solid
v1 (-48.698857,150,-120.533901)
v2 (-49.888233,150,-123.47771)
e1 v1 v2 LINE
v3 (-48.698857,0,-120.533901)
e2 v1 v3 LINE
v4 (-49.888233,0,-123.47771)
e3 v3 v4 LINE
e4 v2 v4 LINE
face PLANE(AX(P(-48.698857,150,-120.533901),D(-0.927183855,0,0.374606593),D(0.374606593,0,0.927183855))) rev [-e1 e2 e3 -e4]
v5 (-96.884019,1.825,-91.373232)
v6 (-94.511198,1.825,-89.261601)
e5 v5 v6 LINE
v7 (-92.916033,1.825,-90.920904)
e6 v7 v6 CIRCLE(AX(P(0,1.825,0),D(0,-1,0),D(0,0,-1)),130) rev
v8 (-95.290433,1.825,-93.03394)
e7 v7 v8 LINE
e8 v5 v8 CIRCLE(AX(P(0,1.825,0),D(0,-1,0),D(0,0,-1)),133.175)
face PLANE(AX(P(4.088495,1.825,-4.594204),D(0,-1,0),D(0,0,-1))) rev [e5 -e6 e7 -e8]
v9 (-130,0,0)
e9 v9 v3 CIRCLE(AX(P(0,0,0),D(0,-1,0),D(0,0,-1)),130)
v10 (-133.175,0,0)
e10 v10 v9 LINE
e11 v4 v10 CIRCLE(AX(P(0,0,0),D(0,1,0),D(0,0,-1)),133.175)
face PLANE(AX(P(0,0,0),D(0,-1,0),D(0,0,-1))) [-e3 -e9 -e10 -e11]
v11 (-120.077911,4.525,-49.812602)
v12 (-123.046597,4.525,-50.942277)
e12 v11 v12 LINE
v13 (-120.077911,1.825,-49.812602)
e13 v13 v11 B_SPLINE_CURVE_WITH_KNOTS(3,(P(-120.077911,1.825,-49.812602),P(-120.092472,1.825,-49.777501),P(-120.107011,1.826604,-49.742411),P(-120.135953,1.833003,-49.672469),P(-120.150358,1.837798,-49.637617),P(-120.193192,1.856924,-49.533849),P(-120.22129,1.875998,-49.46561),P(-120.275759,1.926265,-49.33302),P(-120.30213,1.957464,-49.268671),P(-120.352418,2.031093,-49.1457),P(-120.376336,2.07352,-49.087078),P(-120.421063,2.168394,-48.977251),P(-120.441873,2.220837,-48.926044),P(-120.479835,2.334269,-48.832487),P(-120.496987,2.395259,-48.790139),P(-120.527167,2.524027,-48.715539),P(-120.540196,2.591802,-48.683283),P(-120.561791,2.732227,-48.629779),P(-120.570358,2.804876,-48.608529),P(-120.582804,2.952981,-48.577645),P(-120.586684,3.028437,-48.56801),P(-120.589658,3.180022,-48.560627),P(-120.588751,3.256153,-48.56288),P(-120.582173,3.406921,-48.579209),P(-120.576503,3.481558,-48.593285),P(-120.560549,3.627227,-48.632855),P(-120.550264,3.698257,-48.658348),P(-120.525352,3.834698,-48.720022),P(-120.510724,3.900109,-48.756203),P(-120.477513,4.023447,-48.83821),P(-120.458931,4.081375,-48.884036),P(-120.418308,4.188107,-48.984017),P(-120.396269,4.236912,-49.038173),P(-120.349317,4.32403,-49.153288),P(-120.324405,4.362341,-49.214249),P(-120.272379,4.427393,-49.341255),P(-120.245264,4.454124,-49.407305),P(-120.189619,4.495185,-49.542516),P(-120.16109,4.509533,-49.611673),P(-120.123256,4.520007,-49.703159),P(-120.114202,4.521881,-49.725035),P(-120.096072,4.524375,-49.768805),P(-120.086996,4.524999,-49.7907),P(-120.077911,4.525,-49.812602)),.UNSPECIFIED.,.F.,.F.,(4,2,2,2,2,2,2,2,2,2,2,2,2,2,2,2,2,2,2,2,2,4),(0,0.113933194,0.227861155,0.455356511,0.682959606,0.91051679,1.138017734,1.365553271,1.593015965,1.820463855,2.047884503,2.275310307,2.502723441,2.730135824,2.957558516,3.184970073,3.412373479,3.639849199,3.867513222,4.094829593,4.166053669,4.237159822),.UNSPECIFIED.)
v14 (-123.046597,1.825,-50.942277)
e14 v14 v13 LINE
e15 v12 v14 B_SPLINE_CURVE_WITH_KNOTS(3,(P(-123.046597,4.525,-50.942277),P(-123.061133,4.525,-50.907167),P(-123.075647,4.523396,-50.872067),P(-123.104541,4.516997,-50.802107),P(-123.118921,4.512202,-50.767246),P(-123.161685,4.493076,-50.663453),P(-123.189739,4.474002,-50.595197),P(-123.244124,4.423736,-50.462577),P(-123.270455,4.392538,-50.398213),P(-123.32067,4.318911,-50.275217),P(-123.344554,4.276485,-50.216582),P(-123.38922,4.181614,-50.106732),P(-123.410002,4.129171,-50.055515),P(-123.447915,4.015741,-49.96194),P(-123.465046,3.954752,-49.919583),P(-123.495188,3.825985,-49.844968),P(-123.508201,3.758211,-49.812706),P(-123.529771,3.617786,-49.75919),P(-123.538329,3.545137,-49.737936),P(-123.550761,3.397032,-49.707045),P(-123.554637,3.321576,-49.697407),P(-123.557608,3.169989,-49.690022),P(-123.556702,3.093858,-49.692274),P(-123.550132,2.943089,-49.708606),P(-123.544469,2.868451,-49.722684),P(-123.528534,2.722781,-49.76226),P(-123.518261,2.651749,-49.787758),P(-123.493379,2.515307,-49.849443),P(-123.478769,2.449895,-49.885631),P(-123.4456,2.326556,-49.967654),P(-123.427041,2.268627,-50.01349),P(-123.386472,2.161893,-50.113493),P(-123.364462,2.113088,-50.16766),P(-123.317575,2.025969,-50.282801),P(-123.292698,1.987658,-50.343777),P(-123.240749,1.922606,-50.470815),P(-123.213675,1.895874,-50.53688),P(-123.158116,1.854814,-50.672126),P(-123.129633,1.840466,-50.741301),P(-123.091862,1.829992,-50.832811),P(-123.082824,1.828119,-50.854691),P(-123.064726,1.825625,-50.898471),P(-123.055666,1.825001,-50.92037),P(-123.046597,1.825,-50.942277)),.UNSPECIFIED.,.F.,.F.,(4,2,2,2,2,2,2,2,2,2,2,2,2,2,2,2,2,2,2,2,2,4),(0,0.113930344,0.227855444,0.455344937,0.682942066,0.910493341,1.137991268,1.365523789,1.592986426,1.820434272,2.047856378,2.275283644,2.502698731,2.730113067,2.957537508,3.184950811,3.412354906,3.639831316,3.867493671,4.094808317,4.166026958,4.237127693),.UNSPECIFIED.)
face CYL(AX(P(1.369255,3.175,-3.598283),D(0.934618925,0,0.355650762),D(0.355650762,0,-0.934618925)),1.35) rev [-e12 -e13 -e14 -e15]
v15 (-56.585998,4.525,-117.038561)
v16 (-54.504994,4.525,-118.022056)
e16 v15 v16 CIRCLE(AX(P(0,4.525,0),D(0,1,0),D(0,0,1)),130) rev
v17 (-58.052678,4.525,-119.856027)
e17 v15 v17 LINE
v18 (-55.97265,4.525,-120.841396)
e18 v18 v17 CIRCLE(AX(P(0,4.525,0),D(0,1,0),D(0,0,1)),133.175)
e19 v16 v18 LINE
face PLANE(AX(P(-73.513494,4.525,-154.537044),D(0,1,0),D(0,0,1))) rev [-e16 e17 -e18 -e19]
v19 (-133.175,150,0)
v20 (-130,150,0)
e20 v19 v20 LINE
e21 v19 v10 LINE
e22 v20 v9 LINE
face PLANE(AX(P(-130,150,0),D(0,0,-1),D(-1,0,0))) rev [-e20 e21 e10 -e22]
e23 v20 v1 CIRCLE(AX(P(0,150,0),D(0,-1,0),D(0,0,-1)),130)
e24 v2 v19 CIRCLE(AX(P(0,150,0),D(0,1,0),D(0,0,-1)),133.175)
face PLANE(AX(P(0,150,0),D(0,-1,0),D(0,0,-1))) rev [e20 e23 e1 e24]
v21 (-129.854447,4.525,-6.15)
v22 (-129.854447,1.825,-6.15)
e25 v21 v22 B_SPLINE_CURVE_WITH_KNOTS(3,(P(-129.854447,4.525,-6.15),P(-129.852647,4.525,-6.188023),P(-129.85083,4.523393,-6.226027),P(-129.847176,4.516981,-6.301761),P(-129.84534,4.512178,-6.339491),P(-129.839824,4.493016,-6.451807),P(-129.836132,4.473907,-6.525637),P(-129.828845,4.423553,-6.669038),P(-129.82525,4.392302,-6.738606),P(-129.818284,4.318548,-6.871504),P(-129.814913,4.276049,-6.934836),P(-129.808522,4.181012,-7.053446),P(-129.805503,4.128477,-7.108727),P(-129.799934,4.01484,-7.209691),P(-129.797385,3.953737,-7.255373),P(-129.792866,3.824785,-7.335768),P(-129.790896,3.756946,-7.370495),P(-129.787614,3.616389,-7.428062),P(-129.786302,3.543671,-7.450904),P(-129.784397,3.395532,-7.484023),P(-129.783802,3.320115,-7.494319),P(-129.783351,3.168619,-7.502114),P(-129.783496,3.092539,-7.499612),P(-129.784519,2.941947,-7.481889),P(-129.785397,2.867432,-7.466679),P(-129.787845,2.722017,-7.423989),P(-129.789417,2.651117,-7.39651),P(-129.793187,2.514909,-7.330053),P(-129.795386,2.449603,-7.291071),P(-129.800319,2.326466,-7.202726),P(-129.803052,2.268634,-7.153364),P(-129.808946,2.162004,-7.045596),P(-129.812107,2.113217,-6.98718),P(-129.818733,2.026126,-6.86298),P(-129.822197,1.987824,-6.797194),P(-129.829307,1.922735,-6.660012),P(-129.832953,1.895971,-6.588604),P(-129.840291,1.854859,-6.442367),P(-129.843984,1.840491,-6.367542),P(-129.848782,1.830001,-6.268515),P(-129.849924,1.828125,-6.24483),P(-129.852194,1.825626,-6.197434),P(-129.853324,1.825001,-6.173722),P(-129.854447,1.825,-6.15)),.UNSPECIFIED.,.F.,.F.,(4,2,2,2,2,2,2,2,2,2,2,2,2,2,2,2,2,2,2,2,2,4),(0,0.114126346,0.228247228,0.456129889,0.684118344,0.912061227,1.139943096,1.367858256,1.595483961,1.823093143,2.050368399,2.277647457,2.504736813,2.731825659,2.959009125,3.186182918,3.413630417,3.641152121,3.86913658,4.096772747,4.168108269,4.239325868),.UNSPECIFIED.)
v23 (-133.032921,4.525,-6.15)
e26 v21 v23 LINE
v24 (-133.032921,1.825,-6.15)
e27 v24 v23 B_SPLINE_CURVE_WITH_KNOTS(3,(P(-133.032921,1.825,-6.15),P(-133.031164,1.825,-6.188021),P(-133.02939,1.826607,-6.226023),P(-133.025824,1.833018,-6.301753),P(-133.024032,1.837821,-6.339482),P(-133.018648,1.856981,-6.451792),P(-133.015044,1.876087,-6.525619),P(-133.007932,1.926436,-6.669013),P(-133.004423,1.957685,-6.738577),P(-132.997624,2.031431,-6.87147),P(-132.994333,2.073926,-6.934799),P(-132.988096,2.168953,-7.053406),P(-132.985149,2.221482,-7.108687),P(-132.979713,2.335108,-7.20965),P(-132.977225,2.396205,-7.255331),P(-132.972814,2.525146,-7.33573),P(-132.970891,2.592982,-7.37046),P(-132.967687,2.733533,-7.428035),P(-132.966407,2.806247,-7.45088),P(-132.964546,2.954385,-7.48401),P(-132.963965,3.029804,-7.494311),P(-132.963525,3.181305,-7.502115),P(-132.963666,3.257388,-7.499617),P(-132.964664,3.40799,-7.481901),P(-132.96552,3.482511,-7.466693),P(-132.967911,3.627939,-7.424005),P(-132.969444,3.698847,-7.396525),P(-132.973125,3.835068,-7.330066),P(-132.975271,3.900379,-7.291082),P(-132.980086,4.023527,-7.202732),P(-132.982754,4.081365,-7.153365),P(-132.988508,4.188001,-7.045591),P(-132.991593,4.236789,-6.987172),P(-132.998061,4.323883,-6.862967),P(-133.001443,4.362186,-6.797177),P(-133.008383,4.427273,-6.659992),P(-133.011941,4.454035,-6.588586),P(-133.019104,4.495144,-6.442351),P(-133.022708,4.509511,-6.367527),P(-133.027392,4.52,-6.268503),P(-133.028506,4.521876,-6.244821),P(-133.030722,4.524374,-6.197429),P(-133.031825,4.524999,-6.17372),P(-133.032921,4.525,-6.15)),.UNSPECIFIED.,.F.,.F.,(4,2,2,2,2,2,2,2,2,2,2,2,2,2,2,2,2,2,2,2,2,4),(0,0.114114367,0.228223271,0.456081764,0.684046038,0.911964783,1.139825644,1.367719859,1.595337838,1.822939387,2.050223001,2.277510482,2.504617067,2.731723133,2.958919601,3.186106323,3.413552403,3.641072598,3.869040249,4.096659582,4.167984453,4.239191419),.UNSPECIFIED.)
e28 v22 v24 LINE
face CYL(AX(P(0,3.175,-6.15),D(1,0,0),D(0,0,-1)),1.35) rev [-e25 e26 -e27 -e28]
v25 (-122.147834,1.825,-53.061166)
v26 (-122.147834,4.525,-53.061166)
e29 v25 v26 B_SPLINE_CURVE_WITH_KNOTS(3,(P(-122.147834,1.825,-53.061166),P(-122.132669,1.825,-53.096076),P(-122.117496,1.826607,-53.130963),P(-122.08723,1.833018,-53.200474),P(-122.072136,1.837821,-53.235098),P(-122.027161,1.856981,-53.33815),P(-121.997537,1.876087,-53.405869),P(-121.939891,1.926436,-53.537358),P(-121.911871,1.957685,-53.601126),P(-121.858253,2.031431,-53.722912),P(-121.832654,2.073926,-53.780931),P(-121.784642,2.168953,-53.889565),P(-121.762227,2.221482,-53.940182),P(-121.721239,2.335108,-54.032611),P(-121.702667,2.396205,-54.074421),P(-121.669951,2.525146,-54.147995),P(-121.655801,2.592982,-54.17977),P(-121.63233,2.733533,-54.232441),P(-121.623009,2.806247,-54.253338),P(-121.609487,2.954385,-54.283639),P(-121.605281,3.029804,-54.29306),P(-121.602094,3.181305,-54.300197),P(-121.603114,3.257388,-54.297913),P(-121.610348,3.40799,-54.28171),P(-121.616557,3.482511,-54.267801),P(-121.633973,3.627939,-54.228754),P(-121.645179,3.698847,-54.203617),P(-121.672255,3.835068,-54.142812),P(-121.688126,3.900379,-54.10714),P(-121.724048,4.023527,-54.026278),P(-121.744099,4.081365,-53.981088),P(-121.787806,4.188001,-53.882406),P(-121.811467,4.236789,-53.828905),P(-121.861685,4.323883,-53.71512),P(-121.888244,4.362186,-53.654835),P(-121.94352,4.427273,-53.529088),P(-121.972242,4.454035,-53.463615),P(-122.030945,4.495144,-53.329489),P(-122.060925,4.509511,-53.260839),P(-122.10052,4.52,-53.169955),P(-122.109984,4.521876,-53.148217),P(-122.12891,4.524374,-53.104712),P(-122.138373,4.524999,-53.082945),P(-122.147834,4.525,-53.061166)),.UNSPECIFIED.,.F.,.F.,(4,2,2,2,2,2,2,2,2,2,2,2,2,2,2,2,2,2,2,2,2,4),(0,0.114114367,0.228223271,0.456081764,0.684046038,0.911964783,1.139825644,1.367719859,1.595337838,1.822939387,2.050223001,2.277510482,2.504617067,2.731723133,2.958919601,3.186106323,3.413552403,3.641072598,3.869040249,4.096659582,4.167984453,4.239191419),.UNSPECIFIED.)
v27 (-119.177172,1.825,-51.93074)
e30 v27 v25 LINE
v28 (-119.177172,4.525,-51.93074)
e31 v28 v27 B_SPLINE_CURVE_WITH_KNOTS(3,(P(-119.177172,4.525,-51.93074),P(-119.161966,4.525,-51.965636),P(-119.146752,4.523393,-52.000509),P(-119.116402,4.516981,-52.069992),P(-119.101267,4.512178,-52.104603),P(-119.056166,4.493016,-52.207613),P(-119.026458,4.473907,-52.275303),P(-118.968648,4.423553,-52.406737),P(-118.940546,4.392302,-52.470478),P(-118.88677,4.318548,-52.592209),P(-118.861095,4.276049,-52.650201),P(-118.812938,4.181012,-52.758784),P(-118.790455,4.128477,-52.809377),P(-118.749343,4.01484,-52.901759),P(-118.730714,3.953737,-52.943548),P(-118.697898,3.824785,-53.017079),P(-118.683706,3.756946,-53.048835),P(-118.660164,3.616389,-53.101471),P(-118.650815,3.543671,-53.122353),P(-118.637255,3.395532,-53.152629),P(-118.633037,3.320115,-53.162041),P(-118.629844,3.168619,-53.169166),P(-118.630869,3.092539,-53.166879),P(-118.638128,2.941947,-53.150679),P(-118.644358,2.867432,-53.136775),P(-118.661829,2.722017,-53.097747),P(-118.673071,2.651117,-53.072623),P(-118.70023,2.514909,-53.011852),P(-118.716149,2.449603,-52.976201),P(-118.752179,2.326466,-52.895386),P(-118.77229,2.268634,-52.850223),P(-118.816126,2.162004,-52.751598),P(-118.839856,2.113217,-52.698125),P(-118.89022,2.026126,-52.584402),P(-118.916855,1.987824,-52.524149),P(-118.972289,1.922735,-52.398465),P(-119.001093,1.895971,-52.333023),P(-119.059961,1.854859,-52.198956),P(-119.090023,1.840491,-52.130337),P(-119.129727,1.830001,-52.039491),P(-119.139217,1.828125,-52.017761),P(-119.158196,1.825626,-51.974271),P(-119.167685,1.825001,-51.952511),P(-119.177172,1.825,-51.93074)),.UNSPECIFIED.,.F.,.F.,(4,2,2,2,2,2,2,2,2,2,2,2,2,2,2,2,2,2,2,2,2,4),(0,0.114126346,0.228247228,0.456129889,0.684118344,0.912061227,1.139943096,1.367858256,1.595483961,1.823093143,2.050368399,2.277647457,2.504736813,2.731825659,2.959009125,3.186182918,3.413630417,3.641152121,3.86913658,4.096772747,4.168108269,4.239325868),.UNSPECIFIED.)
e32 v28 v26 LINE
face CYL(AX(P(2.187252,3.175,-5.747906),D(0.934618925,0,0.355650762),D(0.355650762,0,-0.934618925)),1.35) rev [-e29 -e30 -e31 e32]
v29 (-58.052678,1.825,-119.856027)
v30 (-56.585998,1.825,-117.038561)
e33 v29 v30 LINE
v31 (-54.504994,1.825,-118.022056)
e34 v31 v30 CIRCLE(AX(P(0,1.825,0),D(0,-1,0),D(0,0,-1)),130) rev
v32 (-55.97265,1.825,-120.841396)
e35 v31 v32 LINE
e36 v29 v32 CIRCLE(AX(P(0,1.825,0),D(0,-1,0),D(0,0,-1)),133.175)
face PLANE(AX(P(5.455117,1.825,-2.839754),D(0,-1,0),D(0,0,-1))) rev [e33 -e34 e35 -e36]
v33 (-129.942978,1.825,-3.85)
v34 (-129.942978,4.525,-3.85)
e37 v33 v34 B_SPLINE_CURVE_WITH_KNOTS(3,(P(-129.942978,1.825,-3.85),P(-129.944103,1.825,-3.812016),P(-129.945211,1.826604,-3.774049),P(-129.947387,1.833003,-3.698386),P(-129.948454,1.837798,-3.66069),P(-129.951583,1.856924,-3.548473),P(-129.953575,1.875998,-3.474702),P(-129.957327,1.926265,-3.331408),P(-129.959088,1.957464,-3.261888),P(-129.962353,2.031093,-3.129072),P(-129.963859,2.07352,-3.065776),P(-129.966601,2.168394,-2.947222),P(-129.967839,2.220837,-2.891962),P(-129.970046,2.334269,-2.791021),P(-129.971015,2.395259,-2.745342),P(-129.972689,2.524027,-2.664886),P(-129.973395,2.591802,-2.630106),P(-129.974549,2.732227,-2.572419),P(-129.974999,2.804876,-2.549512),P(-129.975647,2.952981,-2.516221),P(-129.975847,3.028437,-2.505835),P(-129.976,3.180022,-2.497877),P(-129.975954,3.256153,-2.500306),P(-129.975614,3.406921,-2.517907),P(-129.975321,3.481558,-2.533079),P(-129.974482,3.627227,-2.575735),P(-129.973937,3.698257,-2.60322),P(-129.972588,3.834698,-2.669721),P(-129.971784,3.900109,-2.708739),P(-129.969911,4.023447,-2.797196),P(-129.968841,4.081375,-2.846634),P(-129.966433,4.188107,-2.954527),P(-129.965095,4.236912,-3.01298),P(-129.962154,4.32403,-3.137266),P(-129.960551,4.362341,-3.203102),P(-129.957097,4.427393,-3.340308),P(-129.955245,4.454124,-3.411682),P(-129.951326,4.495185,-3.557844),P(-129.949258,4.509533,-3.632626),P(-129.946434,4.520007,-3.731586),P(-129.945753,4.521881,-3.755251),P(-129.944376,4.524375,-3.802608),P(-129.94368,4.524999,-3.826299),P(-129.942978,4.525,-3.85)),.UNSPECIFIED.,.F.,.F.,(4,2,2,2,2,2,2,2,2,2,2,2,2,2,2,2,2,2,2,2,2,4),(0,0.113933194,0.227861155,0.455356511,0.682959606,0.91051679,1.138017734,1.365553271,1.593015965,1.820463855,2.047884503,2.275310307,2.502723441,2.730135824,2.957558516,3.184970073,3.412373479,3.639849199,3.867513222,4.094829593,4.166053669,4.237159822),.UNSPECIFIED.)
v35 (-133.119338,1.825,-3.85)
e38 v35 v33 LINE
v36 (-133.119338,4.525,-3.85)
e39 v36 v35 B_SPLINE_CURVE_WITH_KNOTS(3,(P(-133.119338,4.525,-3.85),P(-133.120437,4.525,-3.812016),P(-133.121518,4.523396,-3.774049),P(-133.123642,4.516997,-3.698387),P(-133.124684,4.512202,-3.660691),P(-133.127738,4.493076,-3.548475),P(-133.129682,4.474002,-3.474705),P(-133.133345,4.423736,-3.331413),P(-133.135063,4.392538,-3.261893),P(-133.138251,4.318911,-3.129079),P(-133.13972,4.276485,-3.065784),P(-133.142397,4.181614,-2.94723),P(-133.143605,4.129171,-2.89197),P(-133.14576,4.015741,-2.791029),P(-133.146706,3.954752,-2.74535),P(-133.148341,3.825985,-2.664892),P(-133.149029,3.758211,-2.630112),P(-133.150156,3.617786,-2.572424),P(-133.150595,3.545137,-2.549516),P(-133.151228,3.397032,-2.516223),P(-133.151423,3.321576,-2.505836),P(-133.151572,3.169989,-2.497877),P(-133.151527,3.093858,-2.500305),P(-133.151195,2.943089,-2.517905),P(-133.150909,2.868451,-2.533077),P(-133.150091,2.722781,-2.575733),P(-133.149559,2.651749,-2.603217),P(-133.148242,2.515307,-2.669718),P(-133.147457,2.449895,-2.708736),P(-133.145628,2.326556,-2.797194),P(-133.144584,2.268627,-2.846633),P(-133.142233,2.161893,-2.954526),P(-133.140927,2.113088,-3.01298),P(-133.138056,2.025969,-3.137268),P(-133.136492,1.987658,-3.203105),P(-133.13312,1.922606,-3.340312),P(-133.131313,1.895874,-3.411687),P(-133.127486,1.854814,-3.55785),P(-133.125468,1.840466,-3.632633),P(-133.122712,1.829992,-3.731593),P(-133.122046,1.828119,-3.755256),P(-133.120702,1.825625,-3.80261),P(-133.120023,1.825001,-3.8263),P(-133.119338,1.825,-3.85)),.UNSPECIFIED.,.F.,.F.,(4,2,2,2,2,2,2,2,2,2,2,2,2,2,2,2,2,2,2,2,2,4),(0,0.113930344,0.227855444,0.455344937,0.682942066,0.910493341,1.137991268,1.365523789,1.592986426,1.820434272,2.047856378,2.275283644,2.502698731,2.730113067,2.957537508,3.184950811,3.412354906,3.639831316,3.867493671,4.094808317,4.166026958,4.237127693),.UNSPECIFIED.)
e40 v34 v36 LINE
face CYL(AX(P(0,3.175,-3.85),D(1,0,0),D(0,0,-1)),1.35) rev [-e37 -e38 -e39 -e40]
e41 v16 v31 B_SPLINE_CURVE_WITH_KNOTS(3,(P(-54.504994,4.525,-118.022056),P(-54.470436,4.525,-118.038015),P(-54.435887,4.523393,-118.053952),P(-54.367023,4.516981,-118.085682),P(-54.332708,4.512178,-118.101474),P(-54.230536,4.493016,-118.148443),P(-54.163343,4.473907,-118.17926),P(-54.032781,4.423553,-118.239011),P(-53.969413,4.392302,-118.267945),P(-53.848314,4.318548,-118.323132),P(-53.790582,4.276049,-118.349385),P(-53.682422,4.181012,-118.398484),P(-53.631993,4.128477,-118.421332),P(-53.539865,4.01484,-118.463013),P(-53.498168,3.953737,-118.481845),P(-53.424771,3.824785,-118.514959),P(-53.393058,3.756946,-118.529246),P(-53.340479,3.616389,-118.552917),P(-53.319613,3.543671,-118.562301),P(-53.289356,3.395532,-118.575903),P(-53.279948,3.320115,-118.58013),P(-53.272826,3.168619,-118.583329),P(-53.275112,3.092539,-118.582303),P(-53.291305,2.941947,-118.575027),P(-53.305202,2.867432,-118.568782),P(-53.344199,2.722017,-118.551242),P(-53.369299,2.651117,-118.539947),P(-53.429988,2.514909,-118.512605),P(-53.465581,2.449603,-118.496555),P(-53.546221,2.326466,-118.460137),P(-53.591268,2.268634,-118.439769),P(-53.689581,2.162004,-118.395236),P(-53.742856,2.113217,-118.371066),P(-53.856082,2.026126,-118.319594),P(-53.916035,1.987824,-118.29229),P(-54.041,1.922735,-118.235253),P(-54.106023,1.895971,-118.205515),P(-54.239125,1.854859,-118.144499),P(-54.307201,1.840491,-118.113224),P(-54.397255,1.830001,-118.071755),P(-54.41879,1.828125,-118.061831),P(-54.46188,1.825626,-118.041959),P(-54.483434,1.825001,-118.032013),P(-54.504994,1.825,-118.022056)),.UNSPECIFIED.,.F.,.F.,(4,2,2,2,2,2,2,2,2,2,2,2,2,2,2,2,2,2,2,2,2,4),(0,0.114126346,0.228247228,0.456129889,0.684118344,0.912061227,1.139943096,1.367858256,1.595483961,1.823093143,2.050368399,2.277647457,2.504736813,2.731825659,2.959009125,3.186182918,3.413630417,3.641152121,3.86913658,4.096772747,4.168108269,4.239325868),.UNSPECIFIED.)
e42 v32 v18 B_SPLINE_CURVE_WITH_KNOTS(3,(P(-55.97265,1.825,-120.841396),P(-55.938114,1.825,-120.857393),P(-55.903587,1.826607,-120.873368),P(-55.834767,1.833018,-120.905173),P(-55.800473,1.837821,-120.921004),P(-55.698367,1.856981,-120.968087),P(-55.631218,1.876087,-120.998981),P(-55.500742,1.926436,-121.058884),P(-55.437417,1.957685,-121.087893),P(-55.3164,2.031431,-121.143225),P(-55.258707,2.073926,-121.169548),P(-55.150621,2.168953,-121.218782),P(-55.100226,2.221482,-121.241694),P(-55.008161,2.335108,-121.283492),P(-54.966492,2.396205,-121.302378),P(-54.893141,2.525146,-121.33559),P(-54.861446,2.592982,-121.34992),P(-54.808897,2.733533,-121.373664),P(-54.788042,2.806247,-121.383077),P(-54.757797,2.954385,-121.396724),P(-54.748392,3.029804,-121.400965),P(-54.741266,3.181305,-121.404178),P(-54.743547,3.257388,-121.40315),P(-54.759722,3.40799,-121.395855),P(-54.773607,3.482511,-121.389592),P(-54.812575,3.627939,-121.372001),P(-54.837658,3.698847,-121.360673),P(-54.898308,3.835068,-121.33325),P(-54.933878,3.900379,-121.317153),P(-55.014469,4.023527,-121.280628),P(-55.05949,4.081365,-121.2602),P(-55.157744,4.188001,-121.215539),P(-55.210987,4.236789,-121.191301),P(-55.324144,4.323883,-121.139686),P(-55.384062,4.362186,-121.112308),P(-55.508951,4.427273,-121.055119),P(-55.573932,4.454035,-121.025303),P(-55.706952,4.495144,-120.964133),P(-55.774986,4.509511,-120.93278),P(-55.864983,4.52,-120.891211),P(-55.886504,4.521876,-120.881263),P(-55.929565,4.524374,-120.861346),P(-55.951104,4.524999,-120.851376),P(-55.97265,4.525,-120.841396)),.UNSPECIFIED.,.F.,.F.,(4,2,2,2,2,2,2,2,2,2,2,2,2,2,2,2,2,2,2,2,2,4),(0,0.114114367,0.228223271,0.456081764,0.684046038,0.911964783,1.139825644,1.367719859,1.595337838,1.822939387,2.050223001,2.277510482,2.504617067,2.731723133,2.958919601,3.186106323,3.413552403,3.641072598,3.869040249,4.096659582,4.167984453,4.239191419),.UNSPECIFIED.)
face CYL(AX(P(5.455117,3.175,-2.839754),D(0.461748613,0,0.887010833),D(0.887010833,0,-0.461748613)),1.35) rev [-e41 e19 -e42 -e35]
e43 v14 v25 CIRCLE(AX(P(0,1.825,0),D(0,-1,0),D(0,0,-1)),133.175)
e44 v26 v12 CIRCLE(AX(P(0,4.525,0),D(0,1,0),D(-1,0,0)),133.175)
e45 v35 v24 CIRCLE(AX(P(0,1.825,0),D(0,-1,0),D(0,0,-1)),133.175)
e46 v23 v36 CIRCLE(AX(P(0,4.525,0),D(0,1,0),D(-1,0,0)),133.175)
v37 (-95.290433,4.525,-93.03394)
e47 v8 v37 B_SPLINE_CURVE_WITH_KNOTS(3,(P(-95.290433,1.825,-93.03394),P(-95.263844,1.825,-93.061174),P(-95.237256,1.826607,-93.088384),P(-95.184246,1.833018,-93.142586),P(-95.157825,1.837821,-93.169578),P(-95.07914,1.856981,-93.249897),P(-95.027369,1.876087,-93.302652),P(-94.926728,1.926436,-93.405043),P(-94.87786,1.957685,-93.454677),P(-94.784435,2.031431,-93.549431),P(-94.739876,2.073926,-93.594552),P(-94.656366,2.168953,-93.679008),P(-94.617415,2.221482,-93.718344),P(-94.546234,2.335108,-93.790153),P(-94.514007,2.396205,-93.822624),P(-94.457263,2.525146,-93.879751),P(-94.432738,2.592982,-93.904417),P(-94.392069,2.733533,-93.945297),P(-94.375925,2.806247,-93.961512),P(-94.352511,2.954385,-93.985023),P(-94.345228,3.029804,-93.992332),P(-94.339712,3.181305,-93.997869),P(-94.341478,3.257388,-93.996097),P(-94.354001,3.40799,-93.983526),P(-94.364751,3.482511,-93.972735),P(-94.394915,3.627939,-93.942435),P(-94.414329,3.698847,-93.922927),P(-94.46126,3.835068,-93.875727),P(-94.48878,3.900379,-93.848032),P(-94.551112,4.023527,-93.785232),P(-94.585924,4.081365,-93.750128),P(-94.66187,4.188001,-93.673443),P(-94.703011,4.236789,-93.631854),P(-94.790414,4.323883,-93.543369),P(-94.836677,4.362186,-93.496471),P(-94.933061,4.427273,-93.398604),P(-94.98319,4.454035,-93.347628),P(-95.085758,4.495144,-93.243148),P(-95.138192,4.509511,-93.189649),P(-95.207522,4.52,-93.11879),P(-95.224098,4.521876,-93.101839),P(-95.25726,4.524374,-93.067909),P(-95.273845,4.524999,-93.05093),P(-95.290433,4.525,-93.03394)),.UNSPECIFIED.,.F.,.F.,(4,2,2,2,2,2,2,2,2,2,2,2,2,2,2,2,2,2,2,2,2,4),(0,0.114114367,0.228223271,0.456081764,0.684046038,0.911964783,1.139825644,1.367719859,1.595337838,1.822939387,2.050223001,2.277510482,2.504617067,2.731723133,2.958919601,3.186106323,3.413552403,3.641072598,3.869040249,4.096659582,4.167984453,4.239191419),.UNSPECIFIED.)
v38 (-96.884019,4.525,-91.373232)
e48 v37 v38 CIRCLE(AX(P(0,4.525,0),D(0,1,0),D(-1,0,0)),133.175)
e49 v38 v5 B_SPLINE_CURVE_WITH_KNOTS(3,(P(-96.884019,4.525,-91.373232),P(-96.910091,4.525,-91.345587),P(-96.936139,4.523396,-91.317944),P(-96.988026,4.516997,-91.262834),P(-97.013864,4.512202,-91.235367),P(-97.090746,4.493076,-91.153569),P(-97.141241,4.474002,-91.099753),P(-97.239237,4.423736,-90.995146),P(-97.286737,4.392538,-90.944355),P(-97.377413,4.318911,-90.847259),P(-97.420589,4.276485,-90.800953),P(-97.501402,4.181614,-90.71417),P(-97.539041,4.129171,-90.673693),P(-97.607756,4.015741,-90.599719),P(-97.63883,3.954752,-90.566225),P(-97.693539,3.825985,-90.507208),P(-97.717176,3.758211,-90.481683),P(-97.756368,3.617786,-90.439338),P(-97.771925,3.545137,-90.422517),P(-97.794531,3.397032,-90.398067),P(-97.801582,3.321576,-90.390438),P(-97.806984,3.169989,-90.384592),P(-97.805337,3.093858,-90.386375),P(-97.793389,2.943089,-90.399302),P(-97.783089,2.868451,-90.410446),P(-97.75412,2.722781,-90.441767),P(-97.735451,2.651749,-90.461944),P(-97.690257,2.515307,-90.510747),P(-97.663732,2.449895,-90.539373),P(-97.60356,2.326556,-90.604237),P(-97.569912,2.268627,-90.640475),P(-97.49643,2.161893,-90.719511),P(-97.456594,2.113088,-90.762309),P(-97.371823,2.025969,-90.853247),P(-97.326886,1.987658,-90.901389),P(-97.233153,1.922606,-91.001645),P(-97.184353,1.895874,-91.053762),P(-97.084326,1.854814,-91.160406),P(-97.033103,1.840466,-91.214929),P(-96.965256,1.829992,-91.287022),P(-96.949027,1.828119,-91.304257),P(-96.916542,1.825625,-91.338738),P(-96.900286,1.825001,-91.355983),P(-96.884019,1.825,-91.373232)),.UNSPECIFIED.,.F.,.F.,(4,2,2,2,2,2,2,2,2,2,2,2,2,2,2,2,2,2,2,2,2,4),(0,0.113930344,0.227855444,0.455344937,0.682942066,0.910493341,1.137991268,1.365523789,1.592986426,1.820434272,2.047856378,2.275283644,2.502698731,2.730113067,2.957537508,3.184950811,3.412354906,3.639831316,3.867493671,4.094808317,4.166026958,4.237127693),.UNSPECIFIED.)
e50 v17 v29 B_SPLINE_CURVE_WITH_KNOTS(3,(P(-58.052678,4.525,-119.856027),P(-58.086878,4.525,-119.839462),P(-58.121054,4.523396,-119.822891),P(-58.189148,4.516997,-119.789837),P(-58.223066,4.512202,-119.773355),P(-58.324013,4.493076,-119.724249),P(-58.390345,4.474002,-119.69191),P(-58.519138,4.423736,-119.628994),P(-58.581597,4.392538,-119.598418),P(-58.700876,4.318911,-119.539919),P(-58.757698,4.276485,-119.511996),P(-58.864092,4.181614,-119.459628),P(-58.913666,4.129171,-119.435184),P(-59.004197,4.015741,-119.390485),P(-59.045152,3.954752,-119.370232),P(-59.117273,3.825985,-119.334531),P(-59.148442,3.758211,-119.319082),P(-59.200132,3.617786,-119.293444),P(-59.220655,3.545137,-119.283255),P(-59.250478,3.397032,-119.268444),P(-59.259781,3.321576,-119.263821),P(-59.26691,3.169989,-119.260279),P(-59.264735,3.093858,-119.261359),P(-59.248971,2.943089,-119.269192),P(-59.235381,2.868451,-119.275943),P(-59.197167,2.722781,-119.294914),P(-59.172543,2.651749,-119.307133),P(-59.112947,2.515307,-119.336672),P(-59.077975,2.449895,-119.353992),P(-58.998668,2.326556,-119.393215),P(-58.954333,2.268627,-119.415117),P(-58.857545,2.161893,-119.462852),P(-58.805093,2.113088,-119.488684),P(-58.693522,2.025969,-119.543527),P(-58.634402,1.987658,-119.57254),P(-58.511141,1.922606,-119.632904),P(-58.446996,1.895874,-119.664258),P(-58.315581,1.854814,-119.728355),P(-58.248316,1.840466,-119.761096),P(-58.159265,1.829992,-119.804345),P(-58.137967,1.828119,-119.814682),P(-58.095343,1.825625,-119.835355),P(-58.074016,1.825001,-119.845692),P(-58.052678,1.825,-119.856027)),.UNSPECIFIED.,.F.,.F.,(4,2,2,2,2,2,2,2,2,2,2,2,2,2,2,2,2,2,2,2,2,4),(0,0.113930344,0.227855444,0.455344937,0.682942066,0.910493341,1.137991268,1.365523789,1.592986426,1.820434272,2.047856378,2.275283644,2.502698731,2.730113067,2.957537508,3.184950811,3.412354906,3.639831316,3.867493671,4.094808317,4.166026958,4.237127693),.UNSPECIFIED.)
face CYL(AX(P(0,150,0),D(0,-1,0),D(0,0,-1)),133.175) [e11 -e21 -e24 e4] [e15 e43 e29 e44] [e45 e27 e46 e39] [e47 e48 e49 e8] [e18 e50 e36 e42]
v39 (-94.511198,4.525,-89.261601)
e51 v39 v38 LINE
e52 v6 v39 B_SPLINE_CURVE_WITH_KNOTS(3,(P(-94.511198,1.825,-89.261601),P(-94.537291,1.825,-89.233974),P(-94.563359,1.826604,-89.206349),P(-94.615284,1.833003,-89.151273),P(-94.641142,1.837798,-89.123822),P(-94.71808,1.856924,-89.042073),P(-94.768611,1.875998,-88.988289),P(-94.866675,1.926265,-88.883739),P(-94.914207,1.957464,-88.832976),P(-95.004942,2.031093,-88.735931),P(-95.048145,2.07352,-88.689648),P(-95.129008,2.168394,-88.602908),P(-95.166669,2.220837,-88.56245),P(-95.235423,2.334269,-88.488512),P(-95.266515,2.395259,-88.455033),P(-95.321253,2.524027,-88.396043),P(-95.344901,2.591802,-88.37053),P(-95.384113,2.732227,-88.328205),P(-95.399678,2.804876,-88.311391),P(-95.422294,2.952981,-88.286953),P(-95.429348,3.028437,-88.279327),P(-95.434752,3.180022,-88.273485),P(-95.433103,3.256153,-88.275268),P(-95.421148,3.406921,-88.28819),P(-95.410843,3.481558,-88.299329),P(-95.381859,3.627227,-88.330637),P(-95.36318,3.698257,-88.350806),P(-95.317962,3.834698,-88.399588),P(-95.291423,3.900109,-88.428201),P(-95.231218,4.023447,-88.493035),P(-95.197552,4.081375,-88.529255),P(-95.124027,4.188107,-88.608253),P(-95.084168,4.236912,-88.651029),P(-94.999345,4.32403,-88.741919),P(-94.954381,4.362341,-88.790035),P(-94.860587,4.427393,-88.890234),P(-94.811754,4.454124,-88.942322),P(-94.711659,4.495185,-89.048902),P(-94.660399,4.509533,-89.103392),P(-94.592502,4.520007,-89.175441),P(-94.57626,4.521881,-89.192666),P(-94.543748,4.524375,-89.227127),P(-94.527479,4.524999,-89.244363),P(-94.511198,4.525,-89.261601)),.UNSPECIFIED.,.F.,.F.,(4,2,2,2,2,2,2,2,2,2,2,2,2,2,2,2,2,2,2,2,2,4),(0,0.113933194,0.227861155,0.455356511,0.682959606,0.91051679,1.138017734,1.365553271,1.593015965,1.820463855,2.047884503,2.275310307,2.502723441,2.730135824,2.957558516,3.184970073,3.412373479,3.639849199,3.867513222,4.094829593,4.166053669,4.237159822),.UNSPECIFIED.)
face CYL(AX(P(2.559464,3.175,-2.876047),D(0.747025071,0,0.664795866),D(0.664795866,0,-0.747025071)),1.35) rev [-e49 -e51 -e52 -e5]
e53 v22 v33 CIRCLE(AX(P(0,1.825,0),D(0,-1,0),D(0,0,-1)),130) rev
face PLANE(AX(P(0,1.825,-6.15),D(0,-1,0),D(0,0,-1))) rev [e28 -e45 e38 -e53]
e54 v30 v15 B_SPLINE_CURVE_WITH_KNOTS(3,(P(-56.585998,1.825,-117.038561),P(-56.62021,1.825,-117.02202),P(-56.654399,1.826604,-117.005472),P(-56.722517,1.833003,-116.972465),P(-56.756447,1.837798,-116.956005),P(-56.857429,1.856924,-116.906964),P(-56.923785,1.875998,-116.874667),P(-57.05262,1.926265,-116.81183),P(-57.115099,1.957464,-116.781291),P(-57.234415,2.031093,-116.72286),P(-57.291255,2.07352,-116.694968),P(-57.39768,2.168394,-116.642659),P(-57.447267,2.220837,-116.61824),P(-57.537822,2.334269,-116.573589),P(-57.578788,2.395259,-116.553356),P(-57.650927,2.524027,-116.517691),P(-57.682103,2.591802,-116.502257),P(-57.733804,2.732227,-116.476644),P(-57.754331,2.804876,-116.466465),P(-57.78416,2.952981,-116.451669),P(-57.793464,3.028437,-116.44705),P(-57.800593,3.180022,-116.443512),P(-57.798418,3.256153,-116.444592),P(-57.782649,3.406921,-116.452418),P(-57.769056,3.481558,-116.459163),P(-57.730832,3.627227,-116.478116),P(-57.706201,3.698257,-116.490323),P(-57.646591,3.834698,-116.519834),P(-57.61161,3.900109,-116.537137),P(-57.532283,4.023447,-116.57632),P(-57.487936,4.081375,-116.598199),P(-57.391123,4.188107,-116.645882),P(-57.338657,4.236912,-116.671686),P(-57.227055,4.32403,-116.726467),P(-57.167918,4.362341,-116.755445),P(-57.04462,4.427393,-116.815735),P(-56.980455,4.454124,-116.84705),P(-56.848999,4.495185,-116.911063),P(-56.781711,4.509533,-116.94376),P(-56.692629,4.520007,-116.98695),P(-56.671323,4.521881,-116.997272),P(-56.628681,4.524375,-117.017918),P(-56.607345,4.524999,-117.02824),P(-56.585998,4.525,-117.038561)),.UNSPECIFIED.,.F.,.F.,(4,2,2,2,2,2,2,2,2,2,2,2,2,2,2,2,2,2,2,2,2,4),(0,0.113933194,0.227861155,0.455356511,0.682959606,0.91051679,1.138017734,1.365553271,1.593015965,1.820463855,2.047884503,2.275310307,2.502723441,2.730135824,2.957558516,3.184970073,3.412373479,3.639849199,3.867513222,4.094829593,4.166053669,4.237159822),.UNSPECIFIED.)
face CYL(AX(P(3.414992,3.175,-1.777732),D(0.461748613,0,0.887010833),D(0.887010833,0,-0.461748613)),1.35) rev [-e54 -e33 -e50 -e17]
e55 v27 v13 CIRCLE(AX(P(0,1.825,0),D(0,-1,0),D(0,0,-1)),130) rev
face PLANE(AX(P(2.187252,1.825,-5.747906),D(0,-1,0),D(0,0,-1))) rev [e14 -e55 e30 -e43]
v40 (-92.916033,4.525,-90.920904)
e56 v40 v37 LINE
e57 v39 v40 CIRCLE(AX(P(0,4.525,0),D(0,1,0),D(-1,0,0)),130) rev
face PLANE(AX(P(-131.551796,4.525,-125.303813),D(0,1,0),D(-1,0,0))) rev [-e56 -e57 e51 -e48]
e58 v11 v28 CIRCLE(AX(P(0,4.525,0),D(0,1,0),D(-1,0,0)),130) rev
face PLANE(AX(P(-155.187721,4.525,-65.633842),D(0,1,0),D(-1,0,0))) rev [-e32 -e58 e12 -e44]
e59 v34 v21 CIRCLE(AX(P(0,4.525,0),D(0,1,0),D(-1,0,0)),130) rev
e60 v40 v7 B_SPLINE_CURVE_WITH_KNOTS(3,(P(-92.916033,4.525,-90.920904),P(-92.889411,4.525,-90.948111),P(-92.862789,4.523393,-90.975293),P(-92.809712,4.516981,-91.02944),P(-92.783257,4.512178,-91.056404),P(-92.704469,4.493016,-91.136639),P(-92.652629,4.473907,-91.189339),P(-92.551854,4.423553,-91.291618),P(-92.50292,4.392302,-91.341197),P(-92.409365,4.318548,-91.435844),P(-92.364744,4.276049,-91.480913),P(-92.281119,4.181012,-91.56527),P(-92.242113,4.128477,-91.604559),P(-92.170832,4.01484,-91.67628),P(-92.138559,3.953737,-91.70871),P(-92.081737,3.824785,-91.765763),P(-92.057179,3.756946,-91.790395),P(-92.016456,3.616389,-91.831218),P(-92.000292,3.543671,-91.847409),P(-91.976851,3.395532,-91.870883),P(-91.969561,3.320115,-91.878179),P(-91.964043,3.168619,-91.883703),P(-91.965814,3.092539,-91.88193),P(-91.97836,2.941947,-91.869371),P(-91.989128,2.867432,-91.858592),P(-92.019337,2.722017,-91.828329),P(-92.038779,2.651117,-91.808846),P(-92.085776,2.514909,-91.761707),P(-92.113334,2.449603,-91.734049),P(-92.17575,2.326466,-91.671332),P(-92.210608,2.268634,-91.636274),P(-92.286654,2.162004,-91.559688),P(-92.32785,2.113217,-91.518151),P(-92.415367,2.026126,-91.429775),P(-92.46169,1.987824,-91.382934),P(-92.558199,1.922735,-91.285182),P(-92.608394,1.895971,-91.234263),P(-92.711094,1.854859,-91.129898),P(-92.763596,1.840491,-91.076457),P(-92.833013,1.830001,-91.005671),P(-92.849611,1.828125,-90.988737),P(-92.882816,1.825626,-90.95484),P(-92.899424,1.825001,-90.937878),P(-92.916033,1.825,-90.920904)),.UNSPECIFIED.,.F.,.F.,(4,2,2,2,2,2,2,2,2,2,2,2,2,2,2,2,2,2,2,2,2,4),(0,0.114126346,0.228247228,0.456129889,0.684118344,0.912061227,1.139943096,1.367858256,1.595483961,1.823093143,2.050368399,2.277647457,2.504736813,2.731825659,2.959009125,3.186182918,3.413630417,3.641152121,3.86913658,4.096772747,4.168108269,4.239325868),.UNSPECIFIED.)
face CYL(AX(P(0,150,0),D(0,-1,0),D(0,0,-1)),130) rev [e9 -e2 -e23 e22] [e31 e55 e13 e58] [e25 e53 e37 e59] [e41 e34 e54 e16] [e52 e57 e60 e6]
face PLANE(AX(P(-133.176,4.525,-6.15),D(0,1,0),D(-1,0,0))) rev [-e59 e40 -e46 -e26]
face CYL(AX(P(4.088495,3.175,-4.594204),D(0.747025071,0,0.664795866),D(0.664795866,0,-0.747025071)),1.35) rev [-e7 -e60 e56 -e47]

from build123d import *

# Parameters (mm, degrees)
BOSS_EXTRUDE1_DEPTH        = 150
M2_5_START                 = -133.151532693
M2_5_CLEARANCE_SLOT1_DEPTH = 3.368059081
CIRPATTERN1_COUNT          = 4
CIRPATTERN1_ANGLE          = 62.5


# Read off the part's stored shape, not the designer's step: M2.5 Clearance Slot1
with BuildPart() as part:
    # Sketch1 → Boss-Extrude1 (new body)
    with BuildSketch(Plane(origin=(0, 0, 0), x_dir=(1, 0, 0), z_dir=(0, 1, 0))):
        with BuildLine():
            Line((-130, 0), (-133.175, 0))
            ThreePointArc((-133.175, 0), (-110.407078725, 74.47051492), (-49.888233078, 123.477709832))
            Line((-49.888233078, 123.477709832), (-48.698857144, 120.533901094))
            ThreePointArc((-48.698857144, 120.533901094), (-107.774884432, 72.695077451), (-130, 0))
        make_face()
    extrude(amount=BOSS_EXTRUDE1_DEPTH)

    # M2.5 Clearance Slot1 outline → M2.5 Clearance Slot1 (cut)
    with BuildSketch(Plane.YZ.offset(M2_5_START)):
        with BuildLine():
            ThreePointArc((1.825, -6.15), (3.175, -7.5), (4.525, -6.15))
            Line((4.525, -6.15), (4.525, -3.85))
            ThreePointArc((4.525, -3.85), (3.175, -2.5), (1.825, -3.85))
            Line((1.825, -3.85), (1.825, -6.15))
        make_face()
    m2_5_clearance_slot1 = extrude(amount=M2_5_CLEARANCE_SLOT1_DEPTH, mode=Mode.SUBTRACT)

    # CirPattern1: M2.5 Clearance Slot1 ×4 about axis
    cirpattern1_axis = Axis((0, 150, 0), (0, -1, 0))
    for i in range(1, CIRPATTERN1_COUNT):
        add(m2_5_clearance_slot1.rotate(cirpattern1_axis, i * CIRPATTERN1_ANGLE / (CIRPATTERN1_COUNT - 1)), mode=Mode.SUBTRACT)


solid = part.part
